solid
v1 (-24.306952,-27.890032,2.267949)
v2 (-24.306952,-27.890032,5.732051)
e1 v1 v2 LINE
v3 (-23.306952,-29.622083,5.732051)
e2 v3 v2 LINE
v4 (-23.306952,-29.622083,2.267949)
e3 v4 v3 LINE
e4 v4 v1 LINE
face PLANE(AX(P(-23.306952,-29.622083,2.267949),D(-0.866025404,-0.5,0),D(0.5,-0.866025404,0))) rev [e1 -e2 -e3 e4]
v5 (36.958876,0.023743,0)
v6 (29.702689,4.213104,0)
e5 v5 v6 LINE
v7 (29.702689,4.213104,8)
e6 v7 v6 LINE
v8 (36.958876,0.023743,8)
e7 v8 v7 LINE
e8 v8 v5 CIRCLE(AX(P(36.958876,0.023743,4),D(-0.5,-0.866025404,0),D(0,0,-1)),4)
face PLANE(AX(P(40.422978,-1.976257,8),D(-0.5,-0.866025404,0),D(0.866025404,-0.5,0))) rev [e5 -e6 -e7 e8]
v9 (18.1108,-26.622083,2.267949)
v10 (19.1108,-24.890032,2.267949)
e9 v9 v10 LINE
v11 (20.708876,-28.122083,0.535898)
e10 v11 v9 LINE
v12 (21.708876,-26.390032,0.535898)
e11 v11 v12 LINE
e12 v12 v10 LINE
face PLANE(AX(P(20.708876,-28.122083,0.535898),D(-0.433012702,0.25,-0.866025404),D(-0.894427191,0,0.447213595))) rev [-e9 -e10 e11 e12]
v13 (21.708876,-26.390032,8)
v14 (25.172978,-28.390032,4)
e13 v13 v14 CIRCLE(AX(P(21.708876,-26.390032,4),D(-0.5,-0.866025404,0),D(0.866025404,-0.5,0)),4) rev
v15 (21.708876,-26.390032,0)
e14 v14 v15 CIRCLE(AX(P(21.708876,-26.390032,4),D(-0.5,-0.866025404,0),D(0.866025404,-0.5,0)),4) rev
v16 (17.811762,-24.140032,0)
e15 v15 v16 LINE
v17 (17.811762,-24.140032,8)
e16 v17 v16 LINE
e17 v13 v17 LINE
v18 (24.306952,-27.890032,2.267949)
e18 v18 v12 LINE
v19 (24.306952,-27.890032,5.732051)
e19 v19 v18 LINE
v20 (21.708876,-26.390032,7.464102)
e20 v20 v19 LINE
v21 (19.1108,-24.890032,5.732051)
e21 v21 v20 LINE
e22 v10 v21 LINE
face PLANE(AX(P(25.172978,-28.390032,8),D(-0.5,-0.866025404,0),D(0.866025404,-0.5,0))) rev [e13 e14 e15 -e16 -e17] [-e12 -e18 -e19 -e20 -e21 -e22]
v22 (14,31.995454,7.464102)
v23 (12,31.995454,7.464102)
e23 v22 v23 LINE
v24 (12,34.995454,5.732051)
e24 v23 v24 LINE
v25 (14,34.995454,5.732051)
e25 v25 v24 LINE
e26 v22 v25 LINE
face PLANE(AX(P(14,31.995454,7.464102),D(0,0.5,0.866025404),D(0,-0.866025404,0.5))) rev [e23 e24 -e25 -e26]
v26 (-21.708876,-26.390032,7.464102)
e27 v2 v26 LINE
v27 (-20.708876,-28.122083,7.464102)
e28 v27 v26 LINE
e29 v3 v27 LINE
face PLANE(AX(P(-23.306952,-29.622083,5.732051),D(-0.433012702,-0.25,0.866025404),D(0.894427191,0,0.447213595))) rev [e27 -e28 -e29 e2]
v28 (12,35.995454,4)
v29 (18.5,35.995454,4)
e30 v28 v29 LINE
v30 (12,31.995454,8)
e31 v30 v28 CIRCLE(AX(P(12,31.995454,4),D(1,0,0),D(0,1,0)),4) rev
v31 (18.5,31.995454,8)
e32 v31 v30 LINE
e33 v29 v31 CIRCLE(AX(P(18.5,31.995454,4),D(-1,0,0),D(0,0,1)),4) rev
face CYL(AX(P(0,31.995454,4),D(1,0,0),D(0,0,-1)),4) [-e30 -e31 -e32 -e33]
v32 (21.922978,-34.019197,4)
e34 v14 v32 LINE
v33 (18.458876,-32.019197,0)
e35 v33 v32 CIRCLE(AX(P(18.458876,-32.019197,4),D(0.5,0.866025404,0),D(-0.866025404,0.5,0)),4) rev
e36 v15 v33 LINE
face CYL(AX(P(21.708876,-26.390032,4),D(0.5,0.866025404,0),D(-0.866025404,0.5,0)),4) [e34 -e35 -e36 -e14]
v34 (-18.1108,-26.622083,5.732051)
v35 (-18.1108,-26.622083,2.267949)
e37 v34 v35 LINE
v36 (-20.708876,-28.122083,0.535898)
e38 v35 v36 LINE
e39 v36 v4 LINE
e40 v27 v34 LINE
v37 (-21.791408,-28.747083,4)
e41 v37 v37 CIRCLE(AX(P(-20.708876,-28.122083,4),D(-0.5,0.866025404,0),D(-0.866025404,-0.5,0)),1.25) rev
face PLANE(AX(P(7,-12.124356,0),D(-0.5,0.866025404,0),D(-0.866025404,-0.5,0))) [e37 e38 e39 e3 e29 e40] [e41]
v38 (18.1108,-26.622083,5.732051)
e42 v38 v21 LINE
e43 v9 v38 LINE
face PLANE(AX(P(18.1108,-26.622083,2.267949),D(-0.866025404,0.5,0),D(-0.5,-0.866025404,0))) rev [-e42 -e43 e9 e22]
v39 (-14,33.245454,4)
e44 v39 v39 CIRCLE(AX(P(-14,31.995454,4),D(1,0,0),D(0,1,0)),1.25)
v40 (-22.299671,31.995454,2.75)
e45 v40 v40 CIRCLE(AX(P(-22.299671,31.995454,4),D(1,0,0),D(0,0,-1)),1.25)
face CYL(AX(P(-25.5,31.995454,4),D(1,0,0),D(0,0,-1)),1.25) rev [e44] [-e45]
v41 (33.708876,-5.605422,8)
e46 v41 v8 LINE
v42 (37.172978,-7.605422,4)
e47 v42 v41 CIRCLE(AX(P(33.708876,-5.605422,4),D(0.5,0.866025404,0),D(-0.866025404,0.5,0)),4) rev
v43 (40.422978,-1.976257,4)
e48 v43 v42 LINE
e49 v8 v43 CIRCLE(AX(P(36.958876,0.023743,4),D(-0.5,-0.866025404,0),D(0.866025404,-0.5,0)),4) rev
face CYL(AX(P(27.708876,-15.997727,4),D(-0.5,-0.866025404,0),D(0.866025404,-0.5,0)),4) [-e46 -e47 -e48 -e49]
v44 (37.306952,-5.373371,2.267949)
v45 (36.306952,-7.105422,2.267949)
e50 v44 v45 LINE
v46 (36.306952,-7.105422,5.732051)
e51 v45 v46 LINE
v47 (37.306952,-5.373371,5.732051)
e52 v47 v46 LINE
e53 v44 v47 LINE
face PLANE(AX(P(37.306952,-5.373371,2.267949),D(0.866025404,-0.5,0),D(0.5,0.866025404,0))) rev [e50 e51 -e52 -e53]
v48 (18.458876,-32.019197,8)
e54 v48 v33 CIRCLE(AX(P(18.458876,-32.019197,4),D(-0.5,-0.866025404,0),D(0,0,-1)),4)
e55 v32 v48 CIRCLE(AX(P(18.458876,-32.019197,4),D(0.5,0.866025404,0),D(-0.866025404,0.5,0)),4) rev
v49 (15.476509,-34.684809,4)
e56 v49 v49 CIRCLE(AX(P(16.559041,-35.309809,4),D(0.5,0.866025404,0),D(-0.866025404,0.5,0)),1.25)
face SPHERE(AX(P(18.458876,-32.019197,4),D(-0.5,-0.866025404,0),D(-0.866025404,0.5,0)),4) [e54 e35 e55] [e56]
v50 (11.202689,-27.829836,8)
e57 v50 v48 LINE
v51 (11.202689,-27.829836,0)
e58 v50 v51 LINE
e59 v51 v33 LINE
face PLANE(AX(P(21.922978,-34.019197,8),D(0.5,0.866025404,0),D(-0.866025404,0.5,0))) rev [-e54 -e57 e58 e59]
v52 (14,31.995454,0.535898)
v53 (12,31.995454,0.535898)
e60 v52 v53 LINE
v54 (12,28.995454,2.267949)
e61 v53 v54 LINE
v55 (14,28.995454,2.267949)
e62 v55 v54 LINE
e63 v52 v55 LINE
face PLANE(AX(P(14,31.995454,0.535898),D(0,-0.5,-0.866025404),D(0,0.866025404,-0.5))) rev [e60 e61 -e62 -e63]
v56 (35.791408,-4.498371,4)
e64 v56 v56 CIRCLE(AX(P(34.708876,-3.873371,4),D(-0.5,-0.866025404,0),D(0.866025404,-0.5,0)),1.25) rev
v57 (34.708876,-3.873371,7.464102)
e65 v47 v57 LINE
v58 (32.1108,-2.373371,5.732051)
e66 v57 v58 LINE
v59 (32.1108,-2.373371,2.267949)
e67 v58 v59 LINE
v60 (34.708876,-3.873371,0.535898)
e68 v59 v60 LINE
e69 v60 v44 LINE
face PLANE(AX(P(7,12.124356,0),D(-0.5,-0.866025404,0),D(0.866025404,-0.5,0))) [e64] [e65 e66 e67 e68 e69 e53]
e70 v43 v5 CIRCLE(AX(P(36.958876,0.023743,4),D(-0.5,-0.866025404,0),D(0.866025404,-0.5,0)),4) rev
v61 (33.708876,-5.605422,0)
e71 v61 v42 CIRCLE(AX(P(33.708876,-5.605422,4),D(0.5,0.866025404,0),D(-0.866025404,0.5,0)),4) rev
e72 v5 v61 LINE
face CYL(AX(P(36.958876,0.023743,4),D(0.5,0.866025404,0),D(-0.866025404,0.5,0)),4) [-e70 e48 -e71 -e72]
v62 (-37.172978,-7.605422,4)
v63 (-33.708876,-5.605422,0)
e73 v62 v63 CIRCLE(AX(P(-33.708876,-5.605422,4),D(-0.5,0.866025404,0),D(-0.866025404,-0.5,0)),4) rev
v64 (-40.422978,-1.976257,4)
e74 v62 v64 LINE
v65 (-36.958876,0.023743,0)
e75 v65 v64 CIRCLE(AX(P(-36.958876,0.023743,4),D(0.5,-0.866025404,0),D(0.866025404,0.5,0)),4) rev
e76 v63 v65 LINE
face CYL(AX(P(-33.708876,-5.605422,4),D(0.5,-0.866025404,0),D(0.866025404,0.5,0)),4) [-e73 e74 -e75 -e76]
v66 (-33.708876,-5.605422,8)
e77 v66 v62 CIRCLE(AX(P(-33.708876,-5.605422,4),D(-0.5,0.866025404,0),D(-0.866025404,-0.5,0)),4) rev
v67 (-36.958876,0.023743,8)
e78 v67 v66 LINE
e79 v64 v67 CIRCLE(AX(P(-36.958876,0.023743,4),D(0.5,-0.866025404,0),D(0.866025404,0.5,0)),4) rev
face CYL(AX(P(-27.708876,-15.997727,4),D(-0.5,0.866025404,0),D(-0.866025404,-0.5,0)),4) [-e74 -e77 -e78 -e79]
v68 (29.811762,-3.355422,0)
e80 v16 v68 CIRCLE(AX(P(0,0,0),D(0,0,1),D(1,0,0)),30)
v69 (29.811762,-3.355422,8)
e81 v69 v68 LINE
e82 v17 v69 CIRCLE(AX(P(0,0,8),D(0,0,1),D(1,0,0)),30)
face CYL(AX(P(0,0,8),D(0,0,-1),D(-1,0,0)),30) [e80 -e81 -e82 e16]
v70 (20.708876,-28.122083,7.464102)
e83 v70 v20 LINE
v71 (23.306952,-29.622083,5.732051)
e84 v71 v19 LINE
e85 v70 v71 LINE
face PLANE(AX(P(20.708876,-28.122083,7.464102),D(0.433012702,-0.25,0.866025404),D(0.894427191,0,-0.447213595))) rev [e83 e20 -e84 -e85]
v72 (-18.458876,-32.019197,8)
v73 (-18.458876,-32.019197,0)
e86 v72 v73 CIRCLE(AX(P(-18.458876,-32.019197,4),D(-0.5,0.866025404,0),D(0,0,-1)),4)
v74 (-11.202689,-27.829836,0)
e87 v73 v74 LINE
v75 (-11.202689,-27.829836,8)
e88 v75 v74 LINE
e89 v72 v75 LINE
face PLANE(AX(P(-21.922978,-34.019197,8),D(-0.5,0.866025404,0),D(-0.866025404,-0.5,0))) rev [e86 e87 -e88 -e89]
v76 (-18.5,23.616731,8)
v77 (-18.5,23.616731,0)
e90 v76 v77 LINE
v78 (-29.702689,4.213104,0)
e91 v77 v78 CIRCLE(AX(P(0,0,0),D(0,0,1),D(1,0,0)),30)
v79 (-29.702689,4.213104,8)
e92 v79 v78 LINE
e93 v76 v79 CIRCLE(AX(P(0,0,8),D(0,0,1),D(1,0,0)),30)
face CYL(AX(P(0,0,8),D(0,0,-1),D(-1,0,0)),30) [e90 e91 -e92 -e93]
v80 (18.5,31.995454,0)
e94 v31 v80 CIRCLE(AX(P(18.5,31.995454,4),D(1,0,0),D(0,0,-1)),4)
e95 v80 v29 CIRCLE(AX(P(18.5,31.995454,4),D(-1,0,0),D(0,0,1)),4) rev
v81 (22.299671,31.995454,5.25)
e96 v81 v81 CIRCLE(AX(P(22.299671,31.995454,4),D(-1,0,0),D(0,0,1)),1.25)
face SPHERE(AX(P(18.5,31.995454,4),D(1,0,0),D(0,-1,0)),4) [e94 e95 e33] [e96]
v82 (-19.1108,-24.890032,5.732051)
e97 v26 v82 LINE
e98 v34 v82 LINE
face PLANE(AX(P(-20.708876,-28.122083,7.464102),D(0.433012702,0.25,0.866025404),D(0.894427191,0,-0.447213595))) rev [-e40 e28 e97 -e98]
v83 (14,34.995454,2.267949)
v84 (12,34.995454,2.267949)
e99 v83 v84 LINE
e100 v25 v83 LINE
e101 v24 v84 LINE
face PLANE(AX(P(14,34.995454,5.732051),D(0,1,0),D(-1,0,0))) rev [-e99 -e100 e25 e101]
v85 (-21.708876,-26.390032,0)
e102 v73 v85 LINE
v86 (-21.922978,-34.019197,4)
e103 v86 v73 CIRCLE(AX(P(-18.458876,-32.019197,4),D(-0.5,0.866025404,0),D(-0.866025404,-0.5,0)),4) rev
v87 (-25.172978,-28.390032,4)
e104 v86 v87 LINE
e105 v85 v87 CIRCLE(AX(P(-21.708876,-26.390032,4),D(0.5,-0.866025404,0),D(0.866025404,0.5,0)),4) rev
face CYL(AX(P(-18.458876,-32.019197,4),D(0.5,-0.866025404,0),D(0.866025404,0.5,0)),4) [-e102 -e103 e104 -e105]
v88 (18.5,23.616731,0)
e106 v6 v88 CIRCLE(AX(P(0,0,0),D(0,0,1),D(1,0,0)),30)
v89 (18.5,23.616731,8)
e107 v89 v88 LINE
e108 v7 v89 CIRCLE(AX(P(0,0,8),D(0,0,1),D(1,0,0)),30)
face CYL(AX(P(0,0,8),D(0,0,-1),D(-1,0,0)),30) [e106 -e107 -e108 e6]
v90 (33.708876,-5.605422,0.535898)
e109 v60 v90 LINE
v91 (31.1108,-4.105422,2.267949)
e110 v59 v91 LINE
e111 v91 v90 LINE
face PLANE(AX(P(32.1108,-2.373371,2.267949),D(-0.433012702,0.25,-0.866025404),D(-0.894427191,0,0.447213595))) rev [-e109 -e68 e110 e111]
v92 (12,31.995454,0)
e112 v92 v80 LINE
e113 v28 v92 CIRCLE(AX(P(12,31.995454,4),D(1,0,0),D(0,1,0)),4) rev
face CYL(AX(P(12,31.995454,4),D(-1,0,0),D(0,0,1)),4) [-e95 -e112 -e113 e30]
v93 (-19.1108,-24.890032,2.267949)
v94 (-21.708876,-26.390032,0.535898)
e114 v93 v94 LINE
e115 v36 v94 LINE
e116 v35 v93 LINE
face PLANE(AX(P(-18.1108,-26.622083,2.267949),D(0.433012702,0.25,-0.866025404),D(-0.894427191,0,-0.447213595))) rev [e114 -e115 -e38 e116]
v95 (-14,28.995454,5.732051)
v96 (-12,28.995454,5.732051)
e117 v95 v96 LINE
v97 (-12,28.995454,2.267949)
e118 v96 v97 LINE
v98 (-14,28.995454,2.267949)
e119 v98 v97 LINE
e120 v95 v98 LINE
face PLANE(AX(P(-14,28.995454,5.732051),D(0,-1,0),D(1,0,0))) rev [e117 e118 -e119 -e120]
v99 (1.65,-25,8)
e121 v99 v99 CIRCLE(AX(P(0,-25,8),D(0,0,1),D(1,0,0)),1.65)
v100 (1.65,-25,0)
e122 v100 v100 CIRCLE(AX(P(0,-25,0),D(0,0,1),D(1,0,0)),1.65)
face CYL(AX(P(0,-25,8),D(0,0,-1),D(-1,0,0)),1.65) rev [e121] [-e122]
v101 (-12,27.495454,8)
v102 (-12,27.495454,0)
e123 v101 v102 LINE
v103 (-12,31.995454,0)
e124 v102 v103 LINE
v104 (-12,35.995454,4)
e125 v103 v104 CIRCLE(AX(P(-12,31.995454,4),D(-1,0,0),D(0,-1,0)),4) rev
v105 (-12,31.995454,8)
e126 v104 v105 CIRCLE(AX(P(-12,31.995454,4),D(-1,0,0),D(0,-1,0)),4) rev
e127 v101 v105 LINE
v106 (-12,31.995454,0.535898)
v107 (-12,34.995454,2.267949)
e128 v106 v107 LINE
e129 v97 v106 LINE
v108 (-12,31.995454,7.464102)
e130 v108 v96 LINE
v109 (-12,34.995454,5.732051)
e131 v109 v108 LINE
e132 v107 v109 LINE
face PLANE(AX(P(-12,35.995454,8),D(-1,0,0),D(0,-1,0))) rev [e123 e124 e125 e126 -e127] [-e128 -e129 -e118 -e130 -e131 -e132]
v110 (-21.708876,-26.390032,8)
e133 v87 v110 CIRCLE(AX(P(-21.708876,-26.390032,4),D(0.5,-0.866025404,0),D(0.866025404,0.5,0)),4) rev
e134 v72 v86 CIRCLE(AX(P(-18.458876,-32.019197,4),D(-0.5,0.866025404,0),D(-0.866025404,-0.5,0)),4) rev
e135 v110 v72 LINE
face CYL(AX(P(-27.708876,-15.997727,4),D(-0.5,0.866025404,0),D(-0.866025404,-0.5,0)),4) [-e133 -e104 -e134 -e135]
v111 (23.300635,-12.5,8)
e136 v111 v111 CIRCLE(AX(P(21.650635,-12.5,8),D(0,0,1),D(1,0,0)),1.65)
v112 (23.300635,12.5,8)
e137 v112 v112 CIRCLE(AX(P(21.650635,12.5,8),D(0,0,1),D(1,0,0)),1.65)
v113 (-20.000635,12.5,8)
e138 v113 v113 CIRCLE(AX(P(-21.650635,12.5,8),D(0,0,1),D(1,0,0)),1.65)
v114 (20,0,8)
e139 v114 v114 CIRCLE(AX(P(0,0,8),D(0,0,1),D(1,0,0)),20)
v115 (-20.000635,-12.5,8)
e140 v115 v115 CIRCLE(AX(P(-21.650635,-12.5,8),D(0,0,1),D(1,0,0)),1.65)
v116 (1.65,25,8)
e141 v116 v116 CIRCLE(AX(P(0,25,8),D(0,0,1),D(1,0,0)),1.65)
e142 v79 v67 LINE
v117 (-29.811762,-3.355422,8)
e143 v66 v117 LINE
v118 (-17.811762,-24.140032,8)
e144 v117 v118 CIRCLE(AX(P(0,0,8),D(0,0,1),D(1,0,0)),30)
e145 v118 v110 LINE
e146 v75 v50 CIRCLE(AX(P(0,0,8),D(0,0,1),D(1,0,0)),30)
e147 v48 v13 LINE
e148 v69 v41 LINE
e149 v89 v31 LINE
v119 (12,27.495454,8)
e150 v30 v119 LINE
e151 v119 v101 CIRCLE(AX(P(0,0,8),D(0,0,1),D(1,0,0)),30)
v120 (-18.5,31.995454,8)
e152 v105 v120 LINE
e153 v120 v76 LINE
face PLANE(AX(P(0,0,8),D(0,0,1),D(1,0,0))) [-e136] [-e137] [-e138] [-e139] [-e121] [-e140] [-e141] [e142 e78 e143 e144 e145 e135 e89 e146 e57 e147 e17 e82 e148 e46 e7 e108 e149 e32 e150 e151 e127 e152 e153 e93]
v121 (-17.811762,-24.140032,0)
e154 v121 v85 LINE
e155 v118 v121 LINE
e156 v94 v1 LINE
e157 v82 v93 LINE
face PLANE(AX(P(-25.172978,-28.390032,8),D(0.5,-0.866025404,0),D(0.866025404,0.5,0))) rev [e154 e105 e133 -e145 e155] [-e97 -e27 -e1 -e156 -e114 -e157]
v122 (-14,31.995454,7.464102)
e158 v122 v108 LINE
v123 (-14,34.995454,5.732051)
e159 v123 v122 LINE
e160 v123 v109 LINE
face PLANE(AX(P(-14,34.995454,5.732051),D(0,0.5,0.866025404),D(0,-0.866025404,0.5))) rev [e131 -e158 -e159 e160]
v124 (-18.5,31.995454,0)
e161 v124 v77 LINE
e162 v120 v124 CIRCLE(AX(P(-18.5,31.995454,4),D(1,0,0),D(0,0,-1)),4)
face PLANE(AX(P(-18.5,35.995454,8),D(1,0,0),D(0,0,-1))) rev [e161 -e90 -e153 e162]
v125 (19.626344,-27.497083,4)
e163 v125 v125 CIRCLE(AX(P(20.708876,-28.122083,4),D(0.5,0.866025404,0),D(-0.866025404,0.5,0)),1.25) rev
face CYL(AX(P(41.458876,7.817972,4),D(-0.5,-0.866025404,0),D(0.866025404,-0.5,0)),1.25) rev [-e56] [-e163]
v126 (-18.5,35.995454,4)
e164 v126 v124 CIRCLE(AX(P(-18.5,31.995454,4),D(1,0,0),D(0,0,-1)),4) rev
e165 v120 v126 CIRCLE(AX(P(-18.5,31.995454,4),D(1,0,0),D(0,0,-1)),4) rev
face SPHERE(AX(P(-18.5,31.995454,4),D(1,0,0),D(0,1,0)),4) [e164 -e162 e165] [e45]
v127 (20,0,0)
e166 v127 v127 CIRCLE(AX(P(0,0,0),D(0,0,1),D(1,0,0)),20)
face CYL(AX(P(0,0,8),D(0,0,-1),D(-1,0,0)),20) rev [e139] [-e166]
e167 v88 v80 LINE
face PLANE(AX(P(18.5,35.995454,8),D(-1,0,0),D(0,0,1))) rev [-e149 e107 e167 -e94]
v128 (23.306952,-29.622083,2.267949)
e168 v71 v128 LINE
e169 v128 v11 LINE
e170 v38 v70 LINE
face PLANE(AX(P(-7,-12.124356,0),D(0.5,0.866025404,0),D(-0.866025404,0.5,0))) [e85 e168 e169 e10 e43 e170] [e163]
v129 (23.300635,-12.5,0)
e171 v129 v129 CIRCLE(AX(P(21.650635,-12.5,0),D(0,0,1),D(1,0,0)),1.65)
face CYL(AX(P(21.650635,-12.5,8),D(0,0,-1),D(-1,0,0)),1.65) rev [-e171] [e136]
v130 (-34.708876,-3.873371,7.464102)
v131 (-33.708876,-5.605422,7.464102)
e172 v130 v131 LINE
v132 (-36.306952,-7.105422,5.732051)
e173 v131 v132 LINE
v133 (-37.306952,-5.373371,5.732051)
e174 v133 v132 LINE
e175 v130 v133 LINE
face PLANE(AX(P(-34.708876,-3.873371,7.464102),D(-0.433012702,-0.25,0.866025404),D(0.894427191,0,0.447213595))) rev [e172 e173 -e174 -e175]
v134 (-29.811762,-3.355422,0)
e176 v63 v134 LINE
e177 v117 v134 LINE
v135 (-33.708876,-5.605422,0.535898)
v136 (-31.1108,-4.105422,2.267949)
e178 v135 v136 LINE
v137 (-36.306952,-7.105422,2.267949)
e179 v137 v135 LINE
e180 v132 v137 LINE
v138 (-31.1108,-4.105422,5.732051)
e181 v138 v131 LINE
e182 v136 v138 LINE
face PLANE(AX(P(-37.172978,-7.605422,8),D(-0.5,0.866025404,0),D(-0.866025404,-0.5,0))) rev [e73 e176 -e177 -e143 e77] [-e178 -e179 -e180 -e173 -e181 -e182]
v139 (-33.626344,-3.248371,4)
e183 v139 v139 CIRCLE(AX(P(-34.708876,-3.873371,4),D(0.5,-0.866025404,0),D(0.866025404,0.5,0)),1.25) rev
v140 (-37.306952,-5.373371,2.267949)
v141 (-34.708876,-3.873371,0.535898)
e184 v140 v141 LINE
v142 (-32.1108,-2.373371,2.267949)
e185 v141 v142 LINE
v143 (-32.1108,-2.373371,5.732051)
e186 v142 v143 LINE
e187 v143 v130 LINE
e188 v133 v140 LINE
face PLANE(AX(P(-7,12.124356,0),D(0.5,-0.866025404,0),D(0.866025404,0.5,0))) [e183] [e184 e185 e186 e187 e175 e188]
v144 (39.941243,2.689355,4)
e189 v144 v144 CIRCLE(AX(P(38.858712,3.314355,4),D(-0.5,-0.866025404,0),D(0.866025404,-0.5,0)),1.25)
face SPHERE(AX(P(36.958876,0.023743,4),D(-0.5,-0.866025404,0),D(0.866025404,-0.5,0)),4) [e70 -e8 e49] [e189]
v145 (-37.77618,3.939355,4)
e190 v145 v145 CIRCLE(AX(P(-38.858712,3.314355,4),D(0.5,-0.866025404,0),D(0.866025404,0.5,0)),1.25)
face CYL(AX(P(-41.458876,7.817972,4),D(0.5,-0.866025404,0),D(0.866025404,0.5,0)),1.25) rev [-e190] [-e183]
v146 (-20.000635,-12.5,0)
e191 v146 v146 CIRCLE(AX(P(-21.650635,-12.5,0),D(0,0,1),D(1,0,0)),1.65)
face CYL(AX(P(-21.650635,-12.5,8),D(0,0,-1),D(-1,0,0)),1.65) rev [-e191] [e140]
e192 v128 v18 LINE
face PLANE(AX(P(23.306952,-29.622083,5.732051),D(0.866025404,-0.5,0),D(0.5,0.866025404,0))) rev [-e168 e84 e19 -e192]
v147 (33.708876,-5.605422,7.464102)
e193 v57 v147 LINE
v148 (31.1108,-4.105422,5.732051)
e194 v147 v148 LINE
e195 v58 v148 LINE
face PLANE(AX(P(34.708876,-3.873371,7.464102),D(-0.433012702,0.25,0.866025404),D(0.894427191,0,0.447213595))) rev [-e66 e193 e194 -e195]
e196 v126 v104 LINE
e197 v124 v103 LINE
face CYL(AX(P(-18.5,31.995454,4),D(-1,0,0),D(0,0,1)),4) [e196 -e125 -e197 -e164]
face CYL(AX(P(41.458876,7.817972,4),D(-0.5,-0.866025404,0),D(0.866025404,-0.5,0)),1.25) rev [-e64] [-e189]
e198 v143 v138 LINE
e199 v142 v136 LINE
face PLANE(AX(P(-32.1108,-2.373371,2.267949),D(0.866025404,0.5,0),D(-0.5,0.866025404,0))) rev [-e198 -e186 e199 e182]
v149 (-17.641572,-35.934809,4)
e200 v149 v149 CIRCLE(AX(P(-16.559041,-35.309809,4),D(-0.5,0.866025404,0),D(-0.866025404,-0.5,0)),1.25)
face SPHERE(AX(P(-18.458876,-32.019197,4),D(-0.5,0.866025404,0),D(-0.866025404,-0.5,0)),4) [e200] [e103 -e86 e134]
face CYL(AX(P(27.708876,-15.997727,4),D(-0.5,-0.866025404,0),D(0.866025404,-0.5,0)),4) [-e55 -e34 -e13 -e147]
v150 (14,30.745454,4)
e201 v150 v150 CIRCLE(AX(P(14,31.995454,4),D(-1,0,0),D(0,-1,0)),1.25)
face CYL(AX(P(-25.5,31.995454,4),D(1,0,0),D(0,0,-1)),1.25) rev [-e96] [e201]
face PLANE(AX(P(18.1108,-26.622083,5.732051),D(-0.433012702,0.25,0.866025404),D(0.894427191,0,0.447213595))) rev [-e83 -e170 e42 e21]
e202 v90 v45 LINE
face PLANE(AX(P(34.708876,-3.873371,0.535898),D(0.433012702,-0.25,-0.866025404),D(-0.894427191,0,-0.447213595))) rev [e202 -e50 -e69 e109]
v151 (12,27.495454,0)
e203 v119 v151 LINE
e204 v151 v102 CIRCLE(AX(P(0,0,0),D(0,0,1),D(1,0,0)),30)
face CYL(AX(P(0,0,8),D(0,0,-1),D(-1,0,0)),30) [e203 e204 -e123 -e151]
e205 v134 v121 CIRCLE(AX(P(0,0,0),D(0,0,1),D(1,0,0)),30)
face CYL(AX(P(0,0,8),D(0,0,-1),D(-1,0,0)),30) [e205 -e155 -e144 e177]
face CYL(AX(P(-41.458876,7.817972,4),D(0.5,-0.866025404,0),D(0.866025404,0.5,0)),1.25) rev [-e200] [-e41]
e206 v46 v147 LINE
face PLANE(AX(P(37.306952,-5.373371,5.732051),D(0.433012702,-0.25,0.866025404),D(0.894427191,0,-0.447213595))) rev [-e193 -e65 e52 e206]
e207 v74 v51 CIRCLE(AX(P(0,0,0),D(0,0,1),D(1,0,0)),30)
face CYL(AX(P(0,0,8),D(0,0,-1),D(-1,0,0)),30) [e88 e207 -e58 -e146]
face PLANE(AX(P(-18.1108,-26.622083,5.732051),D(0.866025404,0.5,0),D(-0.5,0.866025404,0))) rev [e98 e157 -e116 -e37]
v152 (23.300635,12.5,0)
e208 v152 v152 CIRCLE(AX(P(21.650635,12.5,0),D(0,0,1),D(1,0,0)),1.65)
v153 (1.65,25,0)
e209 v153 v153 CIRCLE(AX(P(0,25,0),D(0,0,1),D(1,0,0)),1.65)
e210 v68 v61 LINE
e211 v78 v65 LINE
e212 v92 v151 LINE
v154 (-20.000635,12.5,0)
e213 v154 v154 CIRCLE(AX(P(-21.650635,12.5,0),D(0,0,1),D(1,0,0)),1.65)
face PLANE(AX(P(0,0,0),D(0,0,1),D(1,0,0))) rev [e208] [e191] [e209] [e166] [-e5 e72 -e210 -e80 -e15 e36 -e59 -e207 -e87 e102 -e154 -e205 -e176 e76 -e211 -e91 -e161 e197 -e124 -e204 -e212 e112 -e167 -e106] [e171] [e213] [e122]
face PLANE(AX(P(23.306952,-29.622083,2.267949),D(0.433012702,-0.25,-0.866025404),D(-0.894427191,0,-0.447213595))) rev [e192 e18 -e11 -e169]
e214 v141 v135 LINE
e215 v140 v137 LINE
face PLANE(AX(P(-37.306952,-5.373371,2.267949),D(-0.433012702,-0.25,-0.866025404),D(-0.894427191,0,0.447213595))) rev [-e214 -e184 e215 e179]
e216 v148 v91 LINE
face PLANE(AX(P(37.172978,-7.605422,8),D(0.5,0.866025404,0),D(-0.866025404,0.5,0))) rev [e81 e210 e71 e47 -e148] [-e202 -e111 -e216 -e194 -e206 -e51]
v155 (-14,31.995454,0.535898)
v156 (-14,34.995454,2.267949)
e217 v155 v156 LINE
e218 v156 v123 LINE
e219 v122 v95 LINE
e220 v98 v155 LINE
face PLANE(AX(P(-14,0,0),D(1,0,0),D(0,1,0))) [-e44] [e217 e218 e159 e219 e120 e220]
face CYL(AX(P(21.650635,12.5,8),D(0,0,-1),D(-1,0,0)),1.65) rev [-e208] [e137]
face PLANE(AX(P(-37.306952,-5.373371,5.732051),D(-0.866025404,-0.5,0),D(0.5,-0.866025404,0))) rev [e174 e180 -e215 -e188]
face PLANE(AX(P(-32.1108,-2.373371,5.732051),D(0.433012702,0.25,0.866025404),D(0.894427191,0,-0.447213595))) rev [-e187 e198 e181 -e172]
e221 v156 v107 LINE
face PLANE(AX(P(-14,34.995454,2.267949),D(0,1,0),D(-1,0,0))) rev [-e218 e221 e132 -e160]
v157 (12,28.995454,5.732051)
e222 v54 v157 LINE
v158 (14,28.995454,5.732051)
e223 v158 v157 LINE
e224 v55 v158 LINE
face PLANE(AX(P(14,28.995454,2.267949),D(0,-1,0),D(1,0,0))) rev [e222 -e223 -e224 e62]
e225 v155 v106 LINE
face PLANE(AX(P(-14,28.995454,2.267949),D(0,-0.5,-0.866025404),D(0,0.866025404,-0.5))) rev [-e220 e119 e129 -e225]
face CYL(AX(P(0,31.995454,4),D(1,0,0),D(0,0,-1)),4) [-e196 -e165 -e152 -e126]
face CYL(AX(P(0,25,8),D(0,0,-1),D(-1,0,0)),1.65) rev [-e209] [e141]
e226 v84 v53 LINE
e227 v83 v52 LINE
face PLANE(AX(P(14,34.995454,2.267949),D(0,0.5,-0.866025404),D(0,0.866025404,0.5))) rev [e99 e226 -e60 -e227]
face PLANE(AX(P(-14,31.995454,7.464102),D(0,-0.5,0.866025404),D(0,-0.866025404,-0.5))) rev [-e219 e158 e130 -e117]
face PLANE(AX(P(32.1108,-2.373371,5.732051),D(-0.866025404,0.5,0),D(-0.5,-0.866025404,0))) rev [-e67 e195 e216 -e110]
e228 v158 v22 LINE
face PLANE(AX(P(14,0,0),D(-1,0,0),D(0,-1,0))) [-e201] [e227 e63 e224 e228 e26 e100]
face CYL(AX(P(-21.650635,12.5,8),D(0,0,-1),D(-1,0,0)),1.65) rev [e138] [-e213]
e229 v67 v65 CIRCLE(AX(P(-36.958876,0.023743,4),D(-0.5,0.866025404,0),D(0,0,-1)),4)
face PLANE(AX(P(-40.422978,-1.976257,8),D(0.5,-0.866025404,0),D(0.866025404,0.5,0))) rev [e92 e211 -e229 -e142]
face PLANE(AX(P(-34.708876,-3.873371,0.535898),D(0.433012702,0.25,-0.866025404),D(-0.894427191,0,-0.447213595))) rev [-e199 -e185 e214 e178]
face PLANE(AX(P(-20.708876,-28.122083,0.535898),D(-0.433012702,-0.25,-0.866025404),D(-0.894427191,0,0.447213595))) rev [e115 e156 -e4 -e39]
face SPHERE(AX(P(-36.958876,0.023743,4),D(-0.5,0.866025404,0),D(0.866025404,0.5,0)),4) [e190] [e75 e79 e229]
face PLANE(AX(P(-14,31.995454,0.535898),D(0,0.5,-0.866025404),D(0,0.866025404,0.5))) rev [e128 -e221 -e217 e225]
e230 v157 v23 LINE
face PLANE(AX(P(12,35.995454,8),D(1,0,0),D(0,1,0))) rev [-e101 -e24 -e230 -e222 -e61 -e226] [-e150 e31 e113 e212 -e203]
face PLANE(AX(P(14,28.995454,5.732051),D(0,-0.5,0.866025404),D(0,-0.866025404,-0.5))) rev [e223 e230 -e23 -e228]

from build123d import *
from build123d.topology import SkipClean

# Parameters (mm, degrees)
ESQUISSE1_R                  = 20
ESQUISSE1_R_2                = 1.65
BOSS_EXTRU_1_DEPTH           = 8
CONG_1_R                     = 4
ESQUISSE4_R                  = 1.25
ENL_V_MAT_EXTRU_2_DEPTH      = 46
ESQUISSE5_R                  = 1.25
ENL_V_MAT_EXTRU_3_DEPTH      = 46
ENL_V_START                  = -46
ESQUISSE2_R                  = 1.25
ENL_V_MAT_EXTRU_1_DEPTH      = 53
R_P_TITION_CIRCULAIRE1_COUNT = 3
ENL_V_MAT_EXTRU_4_DEPTH      = 2
ENL_V_MAT_EXTRU_5_DEPTH      = 2
R_P_TITION_CIRCULAIRE2_COUNT = 3


with BuildPart() as part:
    # Esquisse1 → Boss.-Extru.1 (new body)
    with BuildSketch(Plane.XY):
        with BuildLine():
            Line((-18.5, 35.99545417), (-18.5, 23.616731357))
            ThreePointArc((-18.5, 23.616731357), (-25.980762114, 15), (-29.70268931, 4.213104291))
            Line((-29.70268931, 4.213104291), (-40.422977732, -1.976257115))
            Line((-40.422977732, -1.976257115), (-37.172977732, -7.605422239))
            Line((-37.172977732, -7.605422239), (-29.8117618, -3.355422239))
            ThreePointArc((-29.8117618, -3.355422239), (-25.980762114, -15), (-17.8117618, -24.14003193))
            Line((-17.8117618, -24.14003193), (-25.172977732, -28.39003193))
            Line((-25.172977732, -28.39003193), (-21.922977732, -34.019197055))
            Line((-21.922977732, -34.019197055), (-11.20268931, -27.829835649))
            ThreePointArc((-11.20268931, -27.829835649), (0, -30), (11.20268931, -27.829835649))
            Line((11.20268931, -27.829835649), (21.922977732, -34.019197055))
            Line((21.922977732, -34.019197055), (25.172977732, -28.39003193))
            Line((25.172977732, -28.39003193), (17.8117618, -24.14003193))
            ThreePointArc((17.8117618, -24.14003193), (25.980762114, -15), (29.8117618, -3.355422239))
            Line((29.8117618, -3.355422239), (37.172977732, -7.605422239))
            Line((37.172977732, -7.605422239), (40.422977732, -1.976257115))
            Line((40.422977732, -1.976257115), (29.70268931, 4.213104291))
            ThreePointArc((29.70268931, 4.213104291), (25.980762114, 15), (18.5, 23.616731357))
            Line((18.5, 23.616731357), (18.5, 35.99545417))
            Line((18.5, 35.99545417), (12, 35.99545417))
            Line((12, 35.99545417), (12, 27.49545417))
            ThreePointArc((12, 27.49545417), (0, 30), (-12, 27.49545417))
            Line((-12, 27.49545417), (-12, 35.99545417))
            Line((-12, 35.99545417), (-18.5, 35.99545417))
        make_face()
        Circle(ESQUISSE1_R, mode=Mode.SUBTRACT)
        with Locations((0, 25)):
            Circle(ESQUISSE1_R_2, mode=Mode.SUBTRACT)
        with Locations((21.650635095, 12.5)):
            Circle(ESQUISSE1_R_2, mode=Mode.SUBTRACT)
        with Locations((21.650635095, -12.5)):
            Circle(ESQUISSE1_R_2, mode=Mode.SUBTRACT)
        with Locations((0, -25)):
            Circle(ESQUISSE1_R_2, mode=Mode.SUBTRACT)
        with Locations((-21.650635095, -12.5)):
            Circle(ESQUISSE1_R_2, mode=Mode.SUBTRACT)
        with Locations((-21.650635095, 12.5)):
            Circle(ESQUISSE1_R_2, mode=Mode.SUBTRACT)
    extrude(amount=BOSS_EXTRU_1_DEPTH)

    # Congé1
    cong_1_edges = [part.edges().sort_by_distance(p)[0] for p in [
        (38.797977732, -4.790839677, 0),
        (38.797977732, -4.790839677, 8),
        (23.547977732, -31.204614493, 0),
        (23.547977732, -31.204614493, 8),
        (15.25, 35.99545417, 0),
        (15.25, 35.99545417, 8),
        (-15.25, 35.99545417, 0),
        (-15.25, 35.99545417, 8),
        (-38.797977732, -4.790839677, 0),
        (-38.797977732, -4.790839677, 8),
        (-23.547977732, -31.204614493, 0),
        (-23.547977732, -31.204614493, 8),
    ]]
    fillet(cong_1_edges, radius=CONG_1_R - 0.0001)  # a hair under: the kernel refuses the full size

    # Esquisse4 → Enlèv. mat.-Extru.2 (cut)
    with BuildSketch(Plane(origin=(9.25, -16.02146997, 0), x_dir=(0.866025403784439, 0.4999999999999994, 0), z_dir=(0.4999999999999994, -0.866025403784439, 0))):
        with Locations((-31.99545417, 4)):
            Circle(ESQUISSE4_R)
    extrude(amount=-ENL_V_MAT_EXTRU_2_DEPTH, mode=Mode.SUBTRACT)

    # Esquisse5 → Enlèv. mat.-Extru.3 (cut)
    with BuildSketch(Plane(origin=(-9.25, -16.02146997, 0), x_dir=(0.8660254037844386, -0.5000000000000002, 0), z_dir=(-0.5000000000000001, -0.8660254037844385, 0))):
        with Locations((31.99545417, 4)):
            Circle(ESQUISSE5_R)
    extrude(amount=-ENL_V_MAT_EXTRU_3_DEPTH, mode=Mode.SUBTRACT)

    # Esquisse7 → Révolution2 (revolve)
    with BuildSketch(Plane.XY.offset(4)):
        with BuildLine():
            Line((-18.5, 35.99545417), (-18.5, 31.99545417))
            Line((-18.5, 31.99545417), (-22.5, 31.99545417))
            ThreePointArc((-22.5, 31.99545417), (-21.328427125, 34.823881294), (-18.5, 35.99545417))
        make_face()
        with BuildLine():
            Line((18.5, 31.99545417), (22.5, 31.99545417))
            ThreePointArc((22.5, 31.99545417), (21.328427125, 34.823881294), (18.5, 35.99545417))
            Line((18.5, 35.99545417), (18.5, 31.99545417))
        make_face()
    r_volution2 = revolve(axis=Axis((-22.5, 31.99545417, 4), (-1, 0, 0)))

    # Esquisse2 → Enlèv. mat.-Extru.1 (cut)
    with BuildSketch(Plane.ZY.offset(18.5).offset(ENL_V_START)):
        with Locations(Location((4, 31.99545417, 0), (0, 0, 90))):
            Circle(ESQUISSE2_R)
    enl_v_mat_extru_1 = extrude(amount=ENL_V_MAT_EXTRU_1_DEPTH, mode=Mode.SUBTRACT)

    # Répétition circulaire1: Révolution2, Enlèv. mat.-Extru.1 ×3 about axis
    with SkipClean():  # the faces are left unmerged after this step: merging them gives an invalid solid
        r_p_tition_circulaire1_axis = Axis((0, 0, 0), (0, 0, 1))
        add([r_volution2.rotate(r_p_tition_circulaire1_axis, i * 360 / R_P_TITION_CIRCULAIRE1_COUNT) for i in range(1, R_P_TITION_CIRCULAIRE1_COUNT)])
        add([enl_v_mat_extru_1.rotate(r_p_tition_circulaire1_axis, i * 360 / R_P_TITION_CIRCULAIRE1_COUNT) for i in range(1, R_P_TITION_CIRCULAIRE1_COUNT)], mode=Mode.SUBTRACT)

    # Esquisse8 → Enlèv. mat.-Extru.4 (cut)
    with SkipClean():  # the faces are left unmerged after this step: merging them gives an invalid solid
        with BuildSketch(Plane(origin=(-12, 0, 0), x_dir=(0, 0, -1), z_dir=(1, 0, 0))):
            Polygon((-0.535898385, 31.99545417), (-2.267949192, 34.99545417), (-5.732050808, 34.99545417), (-7.464101615, 31.99545417), (-5.732050808, 28.99545417), (-2.267949192, 28.99545417), align=None)
        enl_v_mat_extru_4 = extrude(amount=-ENL_V_MAT_EXTRU_4_DEPTH, mode=Mode.SUBTRACT)

    # Esquisse9 → Enlèv. mat.-Extru.5 (cut)
    with SkipClean():  # the faces are left unmerged after this step: merging them gives an invalid solid
        with BuildSketch(Plane.ZY.offset(-12)):
            Polygon((0.535898385, 31.99545417), (2.267949192, 28.99545417), (5.732050808, 28.99545417), (7.464101615, 31.99545417), (5.732050808, 34.99545417), (2.267949192, 34.99545417), align=None)
        enl_v_mat_extru_5 = extrude(amount=-ENL_V_MAT_EXTRU_5_DEPTH, mode=Mode.SUBTRACT)

    # Répétition circulaire2: Enlèv. mat.-Extru.4, Enlèv. mat.-Extru.5 ×3 about axis
    with SkipClean():  # the faces are left unmerged after this step: merging them gives an invalid solid
        r_p_tition_circulaire2_axis = Axis((0, 0, 0), (0, 0, 1))
        add([enl_v_mat_extru_4.rotate(r_p_tition_circulaire2_axis, i * 360 / R_P_TITION_CIRCULAIRE2_COUNT) for i in range(1, R_P_TITION_CIRCULAIRE2_COUNT)], mode=Mode.SUBTRACT)
        add([enl_v_mat_extru_5.rotate(r_p_tition_circulaire2_axis, i * 360 / R_P_TITION_CIRCULAIRE2_COUNT) for i in range(1, R_P_TITION_CIRCULAIRE2_COUNT)], mode=Mode.SUBTRACT)


solid = part.part
